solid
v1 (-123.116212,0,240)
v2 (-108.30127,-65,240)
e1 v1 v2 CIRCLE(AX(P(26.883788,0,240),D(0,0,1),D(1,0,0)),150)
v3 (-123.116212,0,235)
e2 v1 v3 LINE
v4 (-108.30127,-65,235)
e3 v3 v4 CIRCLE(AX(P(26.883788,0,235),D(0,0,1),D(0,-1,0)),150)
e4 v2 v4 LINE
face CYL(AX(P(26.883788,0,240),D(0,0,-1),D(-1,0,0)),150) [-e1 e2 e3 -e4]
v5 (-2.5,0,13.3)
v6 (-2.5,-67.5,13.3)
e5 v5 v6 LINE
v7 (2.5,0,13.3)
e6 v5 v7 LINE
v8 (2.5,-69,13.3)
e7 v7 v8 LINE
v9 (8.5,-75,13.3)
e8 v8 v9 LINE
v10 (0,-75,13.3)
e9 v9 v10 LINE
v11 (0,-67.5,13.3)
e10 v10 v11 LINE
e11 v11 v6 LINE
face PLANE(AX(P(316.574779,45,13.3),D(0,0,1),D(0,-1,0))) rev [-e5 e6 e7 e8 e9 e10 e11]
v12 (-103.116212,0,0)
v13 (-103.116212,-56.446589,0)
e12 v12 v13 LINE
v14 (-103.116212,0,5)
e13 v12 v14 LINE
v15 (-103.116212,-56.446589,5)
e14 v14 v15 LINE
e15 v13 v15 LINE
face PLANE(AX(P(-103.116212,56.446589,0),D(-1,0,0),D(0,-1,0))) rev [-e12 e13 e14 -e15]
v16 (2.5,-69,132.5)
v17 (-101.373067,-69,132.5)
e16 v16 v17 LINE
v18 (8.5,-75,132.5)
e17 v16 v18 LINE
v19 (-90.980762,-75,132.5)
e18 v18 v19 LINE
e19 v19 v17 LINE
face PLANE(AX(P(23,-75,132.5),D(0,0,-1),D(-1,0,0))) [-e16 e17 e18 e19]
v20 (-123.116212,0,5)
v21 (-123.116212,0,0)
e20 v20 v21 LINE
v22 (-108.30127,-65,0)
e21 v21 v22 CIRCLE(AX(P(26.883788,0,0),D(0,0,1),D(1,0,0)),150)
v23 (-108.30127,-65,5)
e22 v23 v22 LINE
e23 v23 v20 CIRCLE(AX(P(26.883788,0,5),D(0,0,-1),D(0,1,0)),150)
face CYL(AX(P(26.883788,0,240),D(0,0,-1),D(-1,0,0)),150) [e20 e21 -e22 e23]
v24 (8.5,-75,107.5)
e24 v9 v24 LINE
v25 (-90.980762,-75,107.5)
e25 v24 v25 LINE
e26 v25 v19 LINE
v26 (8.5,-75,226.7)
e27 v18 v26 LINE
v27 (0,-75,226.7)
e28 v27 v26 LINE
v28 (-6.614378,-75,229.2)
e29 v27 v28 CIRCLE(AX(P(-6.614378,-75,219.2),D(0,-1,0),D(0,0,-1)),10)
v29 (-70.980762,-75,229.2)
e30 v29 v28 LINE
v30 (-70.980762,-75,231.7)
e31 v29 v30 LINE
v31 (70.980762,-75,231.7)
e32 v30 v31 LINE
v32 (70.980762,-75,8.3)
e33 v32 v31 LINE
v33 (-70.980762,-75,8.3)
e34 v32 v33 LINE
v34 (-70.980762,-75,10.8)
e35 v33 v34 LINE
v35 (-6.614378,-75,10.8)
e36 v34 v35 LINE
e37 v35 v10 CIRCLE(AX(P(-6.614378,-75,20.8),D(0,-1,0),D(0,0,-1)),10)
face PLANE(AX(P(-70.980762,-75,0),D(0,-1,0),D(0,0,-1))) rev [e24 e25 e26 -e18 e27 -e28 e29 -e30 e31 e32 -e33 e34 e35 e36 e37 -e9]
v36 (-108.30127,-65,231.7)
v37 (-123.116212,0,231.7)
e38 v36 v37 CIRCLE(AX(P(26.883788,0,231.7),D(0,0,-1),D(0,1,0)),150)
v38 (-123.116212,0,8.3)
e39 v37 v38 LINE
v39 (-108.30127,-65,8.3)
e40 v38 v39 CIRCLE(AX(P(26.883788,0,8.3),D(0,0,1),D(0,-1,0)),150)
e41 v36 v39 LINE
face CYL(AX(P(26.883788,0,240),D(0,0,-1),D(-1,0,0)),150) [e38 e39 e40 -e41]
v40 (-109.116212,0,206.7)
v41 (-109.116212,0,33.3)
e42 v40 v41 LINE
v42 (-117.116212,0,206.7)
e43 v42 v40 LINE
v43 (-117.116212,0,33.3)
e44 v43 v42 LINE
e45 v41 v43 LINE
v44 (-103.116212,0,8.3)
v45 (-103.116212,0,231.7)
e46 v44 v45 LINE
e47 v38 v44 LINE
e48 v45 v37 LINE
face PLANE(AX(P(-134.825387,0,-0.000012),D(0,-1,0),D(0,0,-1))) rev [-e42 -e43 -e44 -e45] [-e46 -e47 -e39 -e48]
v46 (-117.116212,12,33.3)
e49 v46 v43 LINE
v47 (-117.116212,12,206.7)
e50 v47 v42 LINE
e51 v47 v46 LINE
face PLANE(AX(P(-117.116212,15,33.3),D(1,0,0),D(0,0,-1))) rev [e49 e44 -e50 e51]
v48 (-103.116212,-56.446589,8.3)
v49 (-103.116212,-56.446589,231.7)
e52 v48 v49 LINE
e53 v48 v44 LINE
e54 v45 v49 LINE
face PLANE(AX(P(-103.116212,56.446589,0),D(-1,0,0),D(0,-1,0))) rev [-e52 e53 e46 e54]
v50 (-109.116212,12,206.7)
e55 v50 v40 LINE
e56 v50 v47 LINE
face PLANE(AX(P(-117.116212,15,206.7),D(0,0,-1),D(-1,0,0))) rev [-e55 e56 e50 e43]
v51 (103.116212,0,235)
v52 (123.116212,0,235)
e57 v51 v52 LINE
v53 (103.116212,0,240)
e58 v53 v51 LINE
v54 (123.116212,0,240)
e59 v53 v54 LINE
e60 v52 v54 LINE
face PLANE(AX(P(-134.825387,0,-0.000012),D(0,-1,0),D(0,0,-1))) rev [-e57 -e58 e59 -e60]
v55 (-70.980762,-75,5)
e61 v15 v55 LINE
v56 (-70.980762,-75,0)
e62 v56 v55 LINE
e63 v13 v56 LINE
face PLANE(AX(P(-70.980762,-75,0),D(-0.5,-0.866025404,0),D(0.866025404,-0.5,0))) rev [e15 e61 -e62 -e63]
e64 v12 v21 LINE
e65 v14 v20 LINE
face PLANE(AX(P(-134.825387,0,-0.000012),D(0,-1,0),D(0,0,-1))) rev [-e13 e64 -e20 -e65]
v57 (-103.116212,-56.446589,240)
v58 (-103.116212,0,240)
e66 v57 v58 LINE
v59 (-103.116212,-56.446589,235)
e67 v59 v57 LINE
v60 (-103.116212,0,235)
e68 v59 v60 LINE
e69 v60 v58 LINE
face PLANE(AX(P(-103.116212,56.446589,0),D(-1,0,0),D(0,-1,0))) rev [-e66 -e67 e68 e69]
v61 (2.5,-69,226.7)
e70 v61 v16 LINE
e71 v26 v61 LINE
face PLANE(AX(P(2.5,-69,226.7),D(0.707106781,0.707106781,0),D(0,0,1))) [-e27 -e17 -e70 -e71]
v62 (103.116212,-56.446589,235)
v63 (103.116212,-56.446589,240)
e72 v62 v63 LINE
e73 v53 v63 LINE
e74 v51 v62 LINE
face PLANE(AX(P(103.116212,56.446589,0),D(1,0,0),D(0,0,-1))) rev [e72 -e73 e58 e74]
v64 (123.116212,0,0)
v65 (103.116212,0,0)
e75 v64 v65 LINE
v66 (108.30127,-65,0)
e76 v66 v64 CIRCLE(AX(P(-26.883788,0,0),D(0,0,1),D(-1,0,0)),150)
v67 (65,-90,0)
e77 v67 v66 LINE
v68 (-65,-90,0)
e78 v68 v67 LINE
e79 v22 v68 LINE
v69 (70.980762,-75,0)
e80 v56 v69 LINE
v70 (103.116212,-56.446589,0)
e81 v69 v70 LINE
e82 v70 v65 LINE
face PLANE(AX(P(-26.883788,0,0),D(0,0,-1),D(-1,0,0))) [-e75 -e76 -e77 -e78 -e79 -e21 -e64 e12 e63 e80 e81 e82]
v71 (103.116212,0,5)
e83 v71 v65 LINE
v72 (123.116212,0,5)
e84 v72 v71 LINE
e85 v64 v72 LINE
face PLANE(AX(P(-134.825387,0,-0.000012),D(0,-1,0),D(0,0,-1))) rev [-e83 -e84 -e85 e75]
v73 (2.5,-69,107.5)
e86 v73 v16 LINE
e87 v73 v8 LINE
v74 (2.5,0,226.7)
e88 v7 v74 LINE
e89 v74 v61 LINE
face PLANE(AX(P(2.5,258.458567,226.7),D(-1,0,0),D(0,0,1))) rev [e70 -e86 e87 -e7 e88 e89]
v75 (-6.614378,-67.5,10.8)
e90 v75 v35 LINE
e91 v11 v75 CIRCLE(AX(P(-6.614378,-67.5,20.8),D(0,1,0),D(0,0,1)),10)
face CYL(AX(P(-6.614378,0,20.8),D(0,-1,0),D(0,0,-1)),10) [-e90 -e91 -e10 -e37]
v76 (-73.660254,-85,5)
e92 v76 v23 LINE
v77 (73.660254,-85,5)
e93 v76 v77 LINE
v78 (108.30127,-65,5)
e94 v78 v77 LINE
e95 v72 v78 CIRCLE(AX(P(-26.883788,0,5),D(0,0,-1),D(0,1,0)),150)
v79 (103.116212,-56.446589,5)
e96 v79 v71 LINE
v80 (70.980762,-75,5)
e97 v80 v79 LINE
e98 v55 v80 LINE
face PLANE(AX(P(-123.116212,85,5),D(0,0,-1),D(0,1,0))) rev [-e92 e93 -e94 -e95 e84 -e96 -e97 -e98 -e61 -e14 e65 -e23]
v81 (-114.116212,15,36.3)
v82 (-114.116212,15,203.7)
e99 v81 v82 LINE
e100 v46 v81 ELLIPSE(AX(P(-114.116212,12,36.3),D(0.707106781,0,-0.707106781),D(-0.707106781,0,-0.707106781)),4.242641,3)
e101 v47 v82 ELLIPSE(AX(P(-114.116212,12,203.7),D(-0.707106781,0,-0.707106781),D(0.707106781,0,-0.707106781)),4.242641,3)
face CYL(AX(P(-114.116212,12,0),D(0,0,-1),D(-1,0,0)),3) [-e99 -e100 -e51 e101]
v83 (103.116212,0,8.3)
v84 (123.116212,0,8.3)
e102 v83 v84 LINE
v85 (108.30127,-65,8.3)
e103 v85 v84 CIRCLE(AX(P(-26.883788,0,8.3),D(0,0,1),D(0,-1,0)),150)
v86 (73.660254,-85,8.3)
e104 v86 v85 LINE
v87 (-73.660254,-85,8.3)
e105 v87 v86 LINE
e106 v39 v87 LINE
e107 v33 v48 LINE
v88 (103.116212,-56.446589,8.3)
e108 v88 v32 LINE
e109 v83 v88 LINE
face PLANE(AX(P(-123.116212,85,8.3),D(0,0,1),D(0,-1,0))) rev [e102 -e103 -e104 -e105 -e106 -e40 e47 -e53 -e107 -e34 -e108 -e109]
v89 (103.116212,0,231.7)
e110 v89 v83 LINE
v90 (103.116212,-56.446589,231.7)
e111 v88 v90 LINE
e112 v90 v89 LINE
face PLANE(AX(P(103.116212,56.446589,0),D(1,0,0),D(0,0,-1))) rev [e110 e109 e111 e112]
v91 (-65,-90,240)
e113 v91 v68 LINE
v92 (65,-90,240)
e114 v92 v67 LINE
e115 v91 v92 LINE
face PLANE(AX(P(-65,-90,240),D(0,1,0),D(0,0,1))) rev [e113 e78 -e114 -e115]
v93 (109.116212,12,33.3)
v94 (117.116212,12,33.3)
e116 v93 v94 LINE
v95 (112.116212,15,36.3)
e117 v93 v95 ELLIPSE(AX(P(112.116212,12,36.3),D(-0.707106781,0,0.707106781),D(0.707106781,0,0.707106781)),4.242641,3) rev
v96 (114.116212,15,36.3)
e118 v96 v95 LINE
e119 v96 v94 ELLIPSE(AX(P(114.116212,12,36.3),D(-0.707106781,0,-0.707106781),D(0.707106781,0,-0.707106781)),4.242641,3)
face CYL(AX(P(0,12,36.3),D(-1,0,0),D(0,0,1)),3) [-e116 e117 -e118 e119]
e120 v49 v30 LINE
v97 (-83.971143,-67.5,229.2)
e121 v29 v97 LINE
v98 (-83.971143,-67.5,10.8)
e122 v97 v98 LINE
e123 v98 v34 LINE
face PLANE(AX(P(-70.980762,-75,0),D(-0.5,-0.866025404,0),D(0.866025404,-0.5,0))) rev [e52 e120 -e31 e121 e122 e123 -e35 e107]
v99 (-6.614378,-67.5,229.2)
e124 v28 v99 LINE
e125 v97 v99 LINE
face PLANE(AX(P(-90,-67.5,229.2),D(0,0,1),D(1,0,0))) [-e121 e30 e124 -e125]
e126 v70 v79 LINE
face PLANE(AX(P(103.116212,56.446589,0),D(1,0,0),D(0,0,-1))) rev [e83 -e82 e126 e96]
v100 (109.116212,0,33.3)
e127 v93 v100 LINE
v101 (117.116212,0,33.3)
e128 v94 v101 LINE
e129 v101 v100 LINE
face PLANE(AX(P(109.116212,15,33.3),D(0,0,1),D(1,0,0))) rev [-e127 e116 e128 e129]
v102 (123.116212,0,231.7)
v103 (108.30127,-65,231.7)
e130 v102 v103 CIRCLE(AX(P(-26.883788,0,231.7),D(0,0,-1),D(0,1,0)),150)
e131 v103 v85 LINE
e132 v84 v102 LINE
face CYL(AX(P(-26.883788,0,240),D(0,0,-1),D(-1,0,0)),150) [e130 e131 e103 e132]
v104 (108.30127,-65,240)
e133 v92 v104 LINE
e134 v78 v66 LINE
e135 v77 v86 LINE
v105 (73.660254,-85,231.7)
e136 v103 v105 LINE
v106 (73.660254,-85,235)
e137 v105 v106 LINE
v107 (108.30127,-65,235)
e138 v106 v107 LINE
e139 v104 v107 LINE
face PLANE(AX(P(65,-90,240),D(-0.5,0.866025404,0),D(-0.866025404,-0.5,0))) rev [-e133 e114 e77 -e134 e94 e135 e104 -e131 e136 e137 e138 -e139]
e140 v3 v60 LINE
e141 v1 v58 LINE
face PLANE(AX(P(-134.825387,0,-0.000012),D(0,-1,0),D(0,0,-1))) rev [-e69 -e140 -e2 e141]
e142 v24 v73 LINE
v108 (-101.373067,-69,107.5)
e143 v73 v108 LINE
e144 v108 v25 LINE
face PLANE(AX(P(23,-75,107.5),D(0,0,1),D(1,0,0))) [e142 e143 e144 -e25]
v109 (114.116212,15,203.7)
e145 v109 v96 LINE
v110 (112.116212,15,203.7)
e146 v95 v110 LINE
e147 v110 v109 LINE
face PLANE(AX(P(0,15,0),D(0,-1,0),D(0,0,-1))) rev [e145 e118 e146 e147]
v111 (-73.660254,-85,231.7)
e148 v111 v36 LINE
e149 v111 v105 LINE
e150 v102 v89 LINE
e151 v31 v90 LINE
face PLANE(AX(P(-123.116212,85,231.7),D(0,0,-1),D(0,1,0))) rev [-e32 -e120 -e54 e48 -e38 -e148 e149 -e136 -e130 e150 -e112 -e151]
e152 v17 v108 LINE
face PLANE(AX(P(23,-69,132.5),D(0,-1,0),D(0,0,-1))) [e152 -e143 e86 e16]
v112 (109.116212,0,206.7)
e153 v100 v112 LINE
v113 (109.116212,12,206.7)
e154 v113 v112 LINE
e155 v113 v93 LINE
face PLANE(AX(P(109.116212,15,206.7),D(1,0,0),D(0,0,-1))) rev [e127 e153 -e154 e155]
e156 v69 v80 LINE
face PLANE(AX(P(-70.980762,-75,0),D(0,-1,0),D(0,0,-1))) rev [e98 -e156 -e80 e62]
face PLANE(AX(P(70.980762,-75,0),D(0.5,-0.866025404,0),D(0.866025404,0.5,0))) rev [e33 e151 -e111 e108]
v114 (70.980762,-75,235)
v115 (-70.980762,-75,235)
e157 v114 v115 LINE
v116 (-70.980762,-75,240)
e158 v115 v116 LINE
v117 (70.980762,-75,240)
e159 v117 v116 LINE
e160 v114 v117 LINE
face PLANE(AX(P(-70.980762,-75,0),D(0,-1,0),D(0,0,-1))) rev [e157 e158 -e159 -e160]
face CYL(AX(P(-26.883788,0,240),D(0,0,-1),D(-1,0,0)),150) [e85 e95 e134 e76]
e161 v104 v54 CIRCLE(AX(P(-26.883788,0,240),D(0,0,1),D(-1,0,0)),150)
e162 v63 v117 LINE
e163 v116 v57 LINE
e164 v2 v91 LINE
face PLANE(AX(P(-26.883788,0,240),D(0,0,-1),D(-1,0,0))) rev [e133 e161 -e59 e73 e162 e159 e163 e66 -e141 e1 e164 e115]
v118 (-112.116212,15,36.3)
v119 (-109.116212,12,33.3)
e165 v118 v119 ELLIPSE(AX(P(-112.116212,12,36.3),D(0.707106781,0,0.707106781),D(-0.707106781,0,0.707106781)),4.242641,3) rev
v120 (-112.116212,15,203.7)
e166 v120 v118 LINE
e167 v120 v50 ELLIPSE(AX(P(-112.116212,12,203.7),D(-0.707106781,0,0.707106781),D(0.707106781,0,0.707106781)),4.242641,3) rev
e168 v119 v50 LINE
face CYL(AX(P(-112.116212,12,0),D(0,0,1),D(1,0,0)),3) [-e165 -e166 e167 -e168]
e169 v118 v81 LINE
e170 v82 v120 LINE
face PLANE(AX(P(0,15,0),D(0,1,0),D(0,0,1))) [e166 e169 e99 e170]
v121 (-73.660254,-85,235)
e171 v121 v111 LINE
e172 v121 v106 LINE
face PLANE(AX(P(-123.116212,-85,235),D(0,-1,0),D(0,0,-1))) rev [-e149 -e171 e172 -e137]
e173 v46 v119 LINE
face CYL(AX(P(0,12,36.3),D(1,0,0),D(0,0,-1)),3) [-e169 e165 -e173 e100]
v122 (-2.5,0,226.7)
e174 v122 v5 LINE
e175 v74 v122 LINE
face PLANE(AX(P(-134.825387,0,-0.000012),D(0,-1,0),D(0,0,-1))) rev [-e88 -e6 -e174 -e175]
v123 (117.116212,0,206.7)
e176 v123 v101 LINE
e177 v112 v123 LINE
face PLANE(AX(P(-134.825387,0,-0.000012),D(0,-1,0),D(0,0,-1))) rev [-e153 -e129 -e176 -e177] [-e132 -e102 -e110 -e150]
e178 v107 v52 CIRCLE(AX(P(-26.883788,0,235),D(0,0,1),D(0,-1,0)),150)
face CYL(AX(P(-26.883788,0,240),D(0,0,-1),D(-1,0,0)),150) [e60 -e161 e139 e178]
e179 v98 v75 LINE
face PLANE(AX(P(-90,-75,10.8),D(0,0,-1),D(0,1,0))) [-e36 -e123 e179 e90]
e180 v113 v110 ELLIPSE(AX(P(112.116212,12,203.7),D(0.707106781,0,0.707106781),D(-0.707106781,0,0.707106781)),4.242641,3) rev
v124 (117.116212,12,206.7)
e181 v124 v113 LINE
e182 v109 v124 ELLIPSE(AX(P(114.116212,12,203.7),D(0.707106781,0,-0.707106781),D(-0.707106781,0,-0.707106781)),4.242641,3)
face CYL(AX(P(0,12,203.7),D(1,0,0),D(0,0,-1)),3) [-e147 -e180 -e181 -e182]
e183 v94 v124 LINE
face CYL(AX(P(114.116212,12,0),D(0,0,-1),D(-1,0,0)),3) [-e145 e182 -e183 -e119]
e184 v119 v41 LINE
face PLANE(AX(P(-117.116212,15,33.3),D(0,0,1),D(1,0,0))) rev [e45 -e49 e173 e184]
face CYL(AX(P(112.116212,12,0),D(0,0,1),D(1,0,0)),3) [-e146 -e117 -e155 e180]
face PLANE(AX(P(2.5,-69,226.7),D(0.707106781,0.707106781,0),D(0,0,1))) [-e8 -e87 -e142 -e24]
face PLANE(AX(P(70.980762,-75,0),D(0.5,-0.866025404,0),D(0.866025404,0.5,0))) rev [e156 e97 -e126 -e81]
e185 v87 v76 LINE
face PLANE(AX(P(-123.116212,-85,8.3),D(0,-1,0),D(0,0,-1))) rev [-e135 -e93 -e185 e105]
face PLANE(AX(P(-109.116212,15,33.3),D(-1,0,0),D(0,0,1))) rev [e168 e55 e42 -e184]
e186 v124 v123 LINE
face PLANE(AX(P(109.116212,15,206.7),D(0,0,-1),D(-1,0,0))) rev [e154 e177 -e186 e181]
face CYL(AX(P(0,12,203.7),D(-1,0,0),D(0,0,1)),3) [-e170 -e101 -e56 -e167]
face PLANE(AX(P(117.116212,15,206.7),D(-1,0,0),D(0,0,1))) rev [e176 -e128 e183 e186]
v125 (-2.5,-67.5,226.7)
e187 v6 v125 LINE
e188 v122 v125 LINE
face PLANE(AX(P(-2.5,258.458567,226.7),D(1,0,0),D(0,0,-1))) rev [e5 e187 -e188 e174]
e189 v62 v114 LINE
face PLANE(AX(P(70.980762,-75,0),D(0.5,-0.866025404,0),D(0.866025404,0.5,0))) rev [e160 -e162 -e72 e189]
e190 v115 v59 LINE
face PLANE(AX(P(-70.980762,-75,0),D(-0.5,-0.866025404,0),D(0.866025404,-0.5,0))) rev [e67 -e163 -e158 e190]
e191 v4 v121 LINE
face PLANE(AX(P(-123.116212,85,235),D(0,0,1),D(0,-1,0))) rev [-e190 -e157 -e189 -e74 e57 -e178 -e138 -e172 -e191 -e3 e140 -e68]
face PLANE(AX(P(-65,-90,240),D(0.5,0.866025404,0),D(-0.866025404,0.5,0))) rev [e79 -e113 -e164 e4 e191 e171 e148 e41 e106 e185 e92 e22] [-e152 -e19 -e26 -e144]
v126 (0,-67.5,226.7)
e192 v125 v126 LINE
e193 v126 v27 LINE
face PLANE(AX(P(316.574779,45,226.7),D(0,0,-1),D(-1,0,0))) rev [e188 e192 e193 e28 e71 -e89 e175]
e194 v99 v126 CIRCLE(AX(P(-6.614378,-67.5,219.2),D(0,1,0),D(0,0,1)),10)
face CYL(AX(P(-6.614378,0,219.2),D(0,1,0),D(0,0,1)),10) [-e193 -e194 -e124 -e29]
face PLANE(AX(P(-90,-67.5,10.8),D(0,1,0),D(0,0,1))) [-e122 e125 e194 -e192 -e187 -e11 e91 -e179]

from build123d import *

# Parameters (mm, degrees)
BOSS_EXTRUDE1_DEPTH             = 240
CUT_EXTRUDE4_DEPTH              = 285.354710913
CUT_EXTRUDE4_DEPTH_BACK         = 285.354710913
CUT_EXTRUDE5_DEPTH              = 285.354710913
CUT_EXTRUDE5_DEPTH_BACK         = 285.354710913
SKETCH3_W                       = 3.3
SKETCH3_H                       = 170
BOSS_EXTRUDE4_REACH             = 286.355
SKETCH7_W                       = 213.4
SKETCH7_H                       = 5
BOSS_EXTRUDE4_DIRECTION_2_REACH = 286.355
CHAMFER7_SIZE                   = 6
SKETCH8_W                       = 5
SKETCH8_H                       = 213.4
BOSS_EXTRUDE5_DEPTH             = 120
CHAMFER8_SIZE                   = 6
CUT_EXTRUDE6_DEPTH              = 23
CUT_EXTRUDE6_DEPTH_BACK         = 176
SKETCH10_W                      = 25
SKETCH10_H                      = 6
BOSS_EXTRUDE6_DEPTH             = 90
FILLET1_R                       = 10
FILLET2_R                       = 10
SKETCH13_R                      = 1.2
CUT_EXTRUDE7_DEPTH              = 285.354710913
SKETCH14_R                      = 2
CUT_EXTRUDE8_DEPTH              = 47
CUT_EXTRUDE9_DEPTH              = 285.354710957
CUT_EXTRUDE9_DEPTH_BACK         = 285.354710957
SKETCH15_W                      = 272.433286574
SKETCH15_H                      = 99.158633553
SKETCH16_W                      = 8
SKETCH16_H                      = 173.4
BOSS_EXTRUDE7_DEPTH             = 15
FILLET3_R                       = 3


with BuildPart() as part:
    # Sketch1 → Boss-Extrude1 (new body)
    with BuildSketch(Plane.XY):
        with BuildLine():
            Line((-65, 90), (-108.301270189, 65))
            ThreePointArc((-108.301270189, 65), (-123.116211843, 0), (-108.301270189, -65))
            Line((-108.301270189, -65), (-65, -90))
            Line((-65, -90), (65, -90))
            Line((65, -90), (108.301270189, -65))
            ThreePointArc((108.301270189, -65), (123.116211843, 0), (108.301270189, 65))
            Line((108.301270189, 65), (65, 90))
            Line((65, 90), (-65, 90))
        make_face()
    extrude(amount=BOSS_EXTRUDE1_DEPTH)

    # Sketch2 → Cut-Extrude4 (cut, two sides: drawn at the far end of the back side and taken through both)
    with BuildSketch(Plane.XY.offset(240).offset(-CUT_EXTRUDE4_DEPTH_BACK)):
        Polygon((-70.980762114, 75), (70.980762114, 75), (103.116211843, 56.446589448), (103.116211843, -56.446589448), (70.980762114, -75), (-70.980762114, -75), (-103.116211843, -56.446589448), (-103.116211843, 56.446589448), align=None)
    extrude(amount=CUT_EXTRUDE4_DEPTH + CUT_EXTRUDE4_DEPTH_BACK, mode=Mode.SUBTRACT)

    # Sketch3 → Cut-Extrude5 (cut, two sides: drawn at the far end of the back side and taken through both)
    with BuildSketch(Plane(origin=(0, 0, 0), x_dir=(0, 0, -1), z_dir=(1, 0, 0)).offset(-CUT_EXTRUDE5_DEPTH_BACK)):
        with Locations((-233.35, 0)):
            Rectangle(SKETCH3_W, SKETCH3_H)
        with Locations((-6.65, 0)):
            Rectangle(SKETCH3_W, SKETCH3_H)
    extrude(amount=CUT_EXTRUDE5_DEPTH + CUT_EXTRUDE5_DEPTH_BACK, mode=Mode.SUBTRACT)

    # Boss-Extrude4: up to this face of the body (flat: up to its plane)
    boss_extrude4_end = Plane(part.part.faces().sort_by_distance((103.116211843, 0, 120))[0])
    # Sketch7 → Boss-Extrude4 (add, up to the picked face)
    with BuildSketch(Plane(origin=(0, 0, 0), x_dir=(0, 0, -1), z_dir=(1, 0, 0)), mode=Mode.PRIVATE) as boss_extrude4_sk1:
        with Locations((-120, 47.5)):
            Rectangle(SKETCH7_W, SKETCH7_H)
    boss_extrude4_tool1 = split(extrude(boss_extrude4_sk1.sketch, amount=BOSS_EXTRUDE4_REACH, mode=Mode.PRIVATE), bisect_by=boss_extrude4_end, keep=Keep.BOTH, mode=Mode.PRIVATE)
    add(boss_extrude4_tool1.solids().sort_by(Axis((0, 47.5, 120), (1, 0, 0)))[0])

    # Boss-Extrude4 direction 2: up to this face of the body (flat: up to its plane)
    boss_extrude4_direction_2_end = Plane(part.part.faces().sort_by_distance((-103.116211843, 0, 120))[0])
    # Sketch7 → Boss-Extrude4 direction 2 (add, up to the picked face)
    with BuildSketch(Plane(origin=(0, 0, 0), x_dir=(0, 0, -1), z_dir=(1, 0, 0)), mode=Mode.PRIVATE) as boss_extrude4_direction_2_sk1:
        with Locations((-120, 47.5)):
            Rectangle(SKETCH7_W, SKETCH7_H)
    boss_extrude4_direction_2_tool1 = split(extrude(boss_extrude4_direction_2_sk1.sketch, amount=-BOSS_EXTRUDE4_DIRECTION_2_REACH, mode=Mode.PRIVATE), bisect_by=boss_extrude4_direction_2_end, keep=Keep.BOTH, mode=Mode.PRIVATE)
    add(boss_extrude4_direction_2_tool1.solids().sort_by(Axis((0, 47.5, 120), (-1, 0, 0)))[0])

    # Chamfer7
    chamfer7_edges = [part.edges().sort_by_distance(p)[0] for p in [
        (-103.116211843, 45, 120),
        (103.116211843, 45, 120),
    ]]
    chamfer(chamfer7_edges, length=CHAMFER7_SIZE)

    # Sketch8 → Boss-Extrude5 (add)
    with BuildSketch(Plane(origin=(0, -75, 0), x_dir=(1, 0, 0), z_dir=(0, 1, 0))):
        with Locations((0, -120)):
            Rectangle(SKETCH8_W, SKETCH8_H)
    extrude(amount=BOSS_EXTRUDE5_DEPTH)

    # Chamfer8
    chamfer8_edges = [part.edges().sort_by_distance(p)[0] for p in [
        (2.5, -75, 120),
        (-2.5, -75, 120),
        (2.5, 45, 120),
        (-2.5, 45, 120),
    ]]
    chamfer(chamfer8_edges, length=CHAMFER8_SIZE)

    # Sketch10 → Cut-Extrude6 (cut, two sides: drawn at the far end of the back side and taken through both)
    with BuildSketch(Plane(origin=(0, 0, 0), x_dir=(0, 0, -1), z_dir=(1, 0, 0)).offset(-CUT_EXTRUDE6_DEPTH_BACK)):
        with Locations((-120, -72)):
            Rectangle(SKETCH10_W, SKETCH10_H)
    extrude(amount=CUT_EXTRUDE6_DEPTH + CUT_EXTRUDE6_DEPTH_BACK, mode=Mode.SUBTRACT)

    # Sketch12 → Boss-Extrude6 (add)
    with BuildSketch(Plane(origin=(0, 0, 0), x_dir=(0, 0, -1), z_dir=(1, 0, 0))):
        Polygon((-10.8, -67.5), (-229.2, -67.5), (-229.2, -75), (-132.5, -75), (-132.5, -69), (-107.5, -69), (-107.5, -75), (-10.8, -75), align=None)
    extrude(amount=-BOSS_EXTRUDE6_DEPTH)

    # Fillet1
    # the kernel refuses this fillet: 10 mm, written as the material it takes off along each edge
    with BuildSketch(Plane(origin=(0, -75, 10.8), x_dir=(-1, 0, 0), z_dir=(0, 1, 0))) as fillet1_piece_1:
        with BuildLine():
            CenterArc((6.614378278, 10), FILLET1_R, 228.590377891, 41.409622109)
            Line((0, 2.5), (-0.132287566, 2.35))
            ThreePointArc((-0.132287566, 2.35), (-0.2, 1.25), (-0.2, 0))
            Line((-0.2, 0), (0, -0.2))
            Line((0, -0.2), (6.614378278, -0.2))
            Line((6.614378278, -0.2), (6.614378278, 0))
        make_face()
    extrude(amount=24.035945694, mode=Mode.SUBTRACT)

    # Fillet2
    # the kernel refuses this fillet: 10 mm, written as the material it takes off along each edge
    with BuildSketch(Plane(origin=(0, -50.964054306, 229.2), x_dir=(0, 0, -1), z_dir=(0, -1, 0))) as fillet2_piece_1:
        with BuildLine():
            CenterArc((10, -6.614378278), FILLET2_R, 138.590377891, 41.409622109)
            Line((0, -6.614378278), (-0.2, -6.614378278))
            Line((-0.2, -6.614378278), (-0.2, 0))
            Line((-0.2, 0), (0, 0.2))
            ThreePointArc((0, 0.2), (1.25, 0.2), (2.35, 0.132287566))
            Line((2.35, 0.132287566), (2.5, 0))
        make_face()
    extrude(amount=24.035945694, mode=Mode.SUBTRACT)

    # Sketch13 → Cut-Extrude7 (cut, through all)
    with BuildSketch(Plane(origin=(0, 0, 0), x_dir=(0, 0, -1), z_dir=(1, 0, 0))):
        with Locations((-173.35, 62.5)):
            Circle(SKETCH13_R)
        with Locations((-66.65, 62.5)):
            Circle(SKETCH13_R)
    extrude(amount=-CUT_EXTRUDE7_DEPTH, mode=Mode.SUBTRACT)

    # Sketch14 → Cut-Extrude8 (cut)
    with BuildSketch(Plane(origin=(0, 50, 0), x_dir=(1, 0, 0), z_dir=(0, 1, 0))):
        with Locations(Location((-41.18, -120, 0), (0, 0, 270))):
            Circle(SKETCH14_R)
    extrude(amount=-CUT_EXTRUDE8_DEPTH, mode=Mode.SUBTRACT)

    # Sketch15 → Cut-Extrude9 (cut, two sides: drawn at the far end of the back side and taken through both)
    with BuildSketch(Plane.XY.offset(-CUT_EXTRUDE9_DEPTH_BACK)):
        with Locations((1.391256338, 49.579316777)):
            Rectangle(SKETCH15_W, SKETCH15_H)
    extrude(amount=CUT_EXTRUDE9_DEPTH + CUT_EXTRUDE9_DEPTH_BACK, mode=Mode.SUBTRACT)

    # Sketch16 → Boss-Extrude7 (add)
    with BuildSketch(Plane(origin=(0, 0, 0), x_dir=(1, 0, 0), z_dir=(0, 1, 0))):
        with Locations((-113.116211843, -120)):
            Rectangle(SKETCH16_W, SKETCH16_H)
        with Locations((113.116211843, -120)):
            Rectangle(SKETCH16_W, SKETCH16_H)
    extrude(amount=BOSS_EXTRUDE7_DEPTH)

    # Fillet3
    fillet3_edges = [part.edges().sort_by_distance(p)[0] for p in [
        (-117.116211843, 15, 120),
        (-113.116211843, 15, 206.7),
        (-109.116211843, 15, 120),
        (-113.116211843, 15, 33.3),
        (109.116211843, 15, 120),
        (113.116211843, 15, 206.7),
        (117.116211843, 15, 120),
        (113.116211843, 15, 33.3),
    ]]
    fillet(fillet3_edges, radius=FILLET3_R)


solid = part.part
